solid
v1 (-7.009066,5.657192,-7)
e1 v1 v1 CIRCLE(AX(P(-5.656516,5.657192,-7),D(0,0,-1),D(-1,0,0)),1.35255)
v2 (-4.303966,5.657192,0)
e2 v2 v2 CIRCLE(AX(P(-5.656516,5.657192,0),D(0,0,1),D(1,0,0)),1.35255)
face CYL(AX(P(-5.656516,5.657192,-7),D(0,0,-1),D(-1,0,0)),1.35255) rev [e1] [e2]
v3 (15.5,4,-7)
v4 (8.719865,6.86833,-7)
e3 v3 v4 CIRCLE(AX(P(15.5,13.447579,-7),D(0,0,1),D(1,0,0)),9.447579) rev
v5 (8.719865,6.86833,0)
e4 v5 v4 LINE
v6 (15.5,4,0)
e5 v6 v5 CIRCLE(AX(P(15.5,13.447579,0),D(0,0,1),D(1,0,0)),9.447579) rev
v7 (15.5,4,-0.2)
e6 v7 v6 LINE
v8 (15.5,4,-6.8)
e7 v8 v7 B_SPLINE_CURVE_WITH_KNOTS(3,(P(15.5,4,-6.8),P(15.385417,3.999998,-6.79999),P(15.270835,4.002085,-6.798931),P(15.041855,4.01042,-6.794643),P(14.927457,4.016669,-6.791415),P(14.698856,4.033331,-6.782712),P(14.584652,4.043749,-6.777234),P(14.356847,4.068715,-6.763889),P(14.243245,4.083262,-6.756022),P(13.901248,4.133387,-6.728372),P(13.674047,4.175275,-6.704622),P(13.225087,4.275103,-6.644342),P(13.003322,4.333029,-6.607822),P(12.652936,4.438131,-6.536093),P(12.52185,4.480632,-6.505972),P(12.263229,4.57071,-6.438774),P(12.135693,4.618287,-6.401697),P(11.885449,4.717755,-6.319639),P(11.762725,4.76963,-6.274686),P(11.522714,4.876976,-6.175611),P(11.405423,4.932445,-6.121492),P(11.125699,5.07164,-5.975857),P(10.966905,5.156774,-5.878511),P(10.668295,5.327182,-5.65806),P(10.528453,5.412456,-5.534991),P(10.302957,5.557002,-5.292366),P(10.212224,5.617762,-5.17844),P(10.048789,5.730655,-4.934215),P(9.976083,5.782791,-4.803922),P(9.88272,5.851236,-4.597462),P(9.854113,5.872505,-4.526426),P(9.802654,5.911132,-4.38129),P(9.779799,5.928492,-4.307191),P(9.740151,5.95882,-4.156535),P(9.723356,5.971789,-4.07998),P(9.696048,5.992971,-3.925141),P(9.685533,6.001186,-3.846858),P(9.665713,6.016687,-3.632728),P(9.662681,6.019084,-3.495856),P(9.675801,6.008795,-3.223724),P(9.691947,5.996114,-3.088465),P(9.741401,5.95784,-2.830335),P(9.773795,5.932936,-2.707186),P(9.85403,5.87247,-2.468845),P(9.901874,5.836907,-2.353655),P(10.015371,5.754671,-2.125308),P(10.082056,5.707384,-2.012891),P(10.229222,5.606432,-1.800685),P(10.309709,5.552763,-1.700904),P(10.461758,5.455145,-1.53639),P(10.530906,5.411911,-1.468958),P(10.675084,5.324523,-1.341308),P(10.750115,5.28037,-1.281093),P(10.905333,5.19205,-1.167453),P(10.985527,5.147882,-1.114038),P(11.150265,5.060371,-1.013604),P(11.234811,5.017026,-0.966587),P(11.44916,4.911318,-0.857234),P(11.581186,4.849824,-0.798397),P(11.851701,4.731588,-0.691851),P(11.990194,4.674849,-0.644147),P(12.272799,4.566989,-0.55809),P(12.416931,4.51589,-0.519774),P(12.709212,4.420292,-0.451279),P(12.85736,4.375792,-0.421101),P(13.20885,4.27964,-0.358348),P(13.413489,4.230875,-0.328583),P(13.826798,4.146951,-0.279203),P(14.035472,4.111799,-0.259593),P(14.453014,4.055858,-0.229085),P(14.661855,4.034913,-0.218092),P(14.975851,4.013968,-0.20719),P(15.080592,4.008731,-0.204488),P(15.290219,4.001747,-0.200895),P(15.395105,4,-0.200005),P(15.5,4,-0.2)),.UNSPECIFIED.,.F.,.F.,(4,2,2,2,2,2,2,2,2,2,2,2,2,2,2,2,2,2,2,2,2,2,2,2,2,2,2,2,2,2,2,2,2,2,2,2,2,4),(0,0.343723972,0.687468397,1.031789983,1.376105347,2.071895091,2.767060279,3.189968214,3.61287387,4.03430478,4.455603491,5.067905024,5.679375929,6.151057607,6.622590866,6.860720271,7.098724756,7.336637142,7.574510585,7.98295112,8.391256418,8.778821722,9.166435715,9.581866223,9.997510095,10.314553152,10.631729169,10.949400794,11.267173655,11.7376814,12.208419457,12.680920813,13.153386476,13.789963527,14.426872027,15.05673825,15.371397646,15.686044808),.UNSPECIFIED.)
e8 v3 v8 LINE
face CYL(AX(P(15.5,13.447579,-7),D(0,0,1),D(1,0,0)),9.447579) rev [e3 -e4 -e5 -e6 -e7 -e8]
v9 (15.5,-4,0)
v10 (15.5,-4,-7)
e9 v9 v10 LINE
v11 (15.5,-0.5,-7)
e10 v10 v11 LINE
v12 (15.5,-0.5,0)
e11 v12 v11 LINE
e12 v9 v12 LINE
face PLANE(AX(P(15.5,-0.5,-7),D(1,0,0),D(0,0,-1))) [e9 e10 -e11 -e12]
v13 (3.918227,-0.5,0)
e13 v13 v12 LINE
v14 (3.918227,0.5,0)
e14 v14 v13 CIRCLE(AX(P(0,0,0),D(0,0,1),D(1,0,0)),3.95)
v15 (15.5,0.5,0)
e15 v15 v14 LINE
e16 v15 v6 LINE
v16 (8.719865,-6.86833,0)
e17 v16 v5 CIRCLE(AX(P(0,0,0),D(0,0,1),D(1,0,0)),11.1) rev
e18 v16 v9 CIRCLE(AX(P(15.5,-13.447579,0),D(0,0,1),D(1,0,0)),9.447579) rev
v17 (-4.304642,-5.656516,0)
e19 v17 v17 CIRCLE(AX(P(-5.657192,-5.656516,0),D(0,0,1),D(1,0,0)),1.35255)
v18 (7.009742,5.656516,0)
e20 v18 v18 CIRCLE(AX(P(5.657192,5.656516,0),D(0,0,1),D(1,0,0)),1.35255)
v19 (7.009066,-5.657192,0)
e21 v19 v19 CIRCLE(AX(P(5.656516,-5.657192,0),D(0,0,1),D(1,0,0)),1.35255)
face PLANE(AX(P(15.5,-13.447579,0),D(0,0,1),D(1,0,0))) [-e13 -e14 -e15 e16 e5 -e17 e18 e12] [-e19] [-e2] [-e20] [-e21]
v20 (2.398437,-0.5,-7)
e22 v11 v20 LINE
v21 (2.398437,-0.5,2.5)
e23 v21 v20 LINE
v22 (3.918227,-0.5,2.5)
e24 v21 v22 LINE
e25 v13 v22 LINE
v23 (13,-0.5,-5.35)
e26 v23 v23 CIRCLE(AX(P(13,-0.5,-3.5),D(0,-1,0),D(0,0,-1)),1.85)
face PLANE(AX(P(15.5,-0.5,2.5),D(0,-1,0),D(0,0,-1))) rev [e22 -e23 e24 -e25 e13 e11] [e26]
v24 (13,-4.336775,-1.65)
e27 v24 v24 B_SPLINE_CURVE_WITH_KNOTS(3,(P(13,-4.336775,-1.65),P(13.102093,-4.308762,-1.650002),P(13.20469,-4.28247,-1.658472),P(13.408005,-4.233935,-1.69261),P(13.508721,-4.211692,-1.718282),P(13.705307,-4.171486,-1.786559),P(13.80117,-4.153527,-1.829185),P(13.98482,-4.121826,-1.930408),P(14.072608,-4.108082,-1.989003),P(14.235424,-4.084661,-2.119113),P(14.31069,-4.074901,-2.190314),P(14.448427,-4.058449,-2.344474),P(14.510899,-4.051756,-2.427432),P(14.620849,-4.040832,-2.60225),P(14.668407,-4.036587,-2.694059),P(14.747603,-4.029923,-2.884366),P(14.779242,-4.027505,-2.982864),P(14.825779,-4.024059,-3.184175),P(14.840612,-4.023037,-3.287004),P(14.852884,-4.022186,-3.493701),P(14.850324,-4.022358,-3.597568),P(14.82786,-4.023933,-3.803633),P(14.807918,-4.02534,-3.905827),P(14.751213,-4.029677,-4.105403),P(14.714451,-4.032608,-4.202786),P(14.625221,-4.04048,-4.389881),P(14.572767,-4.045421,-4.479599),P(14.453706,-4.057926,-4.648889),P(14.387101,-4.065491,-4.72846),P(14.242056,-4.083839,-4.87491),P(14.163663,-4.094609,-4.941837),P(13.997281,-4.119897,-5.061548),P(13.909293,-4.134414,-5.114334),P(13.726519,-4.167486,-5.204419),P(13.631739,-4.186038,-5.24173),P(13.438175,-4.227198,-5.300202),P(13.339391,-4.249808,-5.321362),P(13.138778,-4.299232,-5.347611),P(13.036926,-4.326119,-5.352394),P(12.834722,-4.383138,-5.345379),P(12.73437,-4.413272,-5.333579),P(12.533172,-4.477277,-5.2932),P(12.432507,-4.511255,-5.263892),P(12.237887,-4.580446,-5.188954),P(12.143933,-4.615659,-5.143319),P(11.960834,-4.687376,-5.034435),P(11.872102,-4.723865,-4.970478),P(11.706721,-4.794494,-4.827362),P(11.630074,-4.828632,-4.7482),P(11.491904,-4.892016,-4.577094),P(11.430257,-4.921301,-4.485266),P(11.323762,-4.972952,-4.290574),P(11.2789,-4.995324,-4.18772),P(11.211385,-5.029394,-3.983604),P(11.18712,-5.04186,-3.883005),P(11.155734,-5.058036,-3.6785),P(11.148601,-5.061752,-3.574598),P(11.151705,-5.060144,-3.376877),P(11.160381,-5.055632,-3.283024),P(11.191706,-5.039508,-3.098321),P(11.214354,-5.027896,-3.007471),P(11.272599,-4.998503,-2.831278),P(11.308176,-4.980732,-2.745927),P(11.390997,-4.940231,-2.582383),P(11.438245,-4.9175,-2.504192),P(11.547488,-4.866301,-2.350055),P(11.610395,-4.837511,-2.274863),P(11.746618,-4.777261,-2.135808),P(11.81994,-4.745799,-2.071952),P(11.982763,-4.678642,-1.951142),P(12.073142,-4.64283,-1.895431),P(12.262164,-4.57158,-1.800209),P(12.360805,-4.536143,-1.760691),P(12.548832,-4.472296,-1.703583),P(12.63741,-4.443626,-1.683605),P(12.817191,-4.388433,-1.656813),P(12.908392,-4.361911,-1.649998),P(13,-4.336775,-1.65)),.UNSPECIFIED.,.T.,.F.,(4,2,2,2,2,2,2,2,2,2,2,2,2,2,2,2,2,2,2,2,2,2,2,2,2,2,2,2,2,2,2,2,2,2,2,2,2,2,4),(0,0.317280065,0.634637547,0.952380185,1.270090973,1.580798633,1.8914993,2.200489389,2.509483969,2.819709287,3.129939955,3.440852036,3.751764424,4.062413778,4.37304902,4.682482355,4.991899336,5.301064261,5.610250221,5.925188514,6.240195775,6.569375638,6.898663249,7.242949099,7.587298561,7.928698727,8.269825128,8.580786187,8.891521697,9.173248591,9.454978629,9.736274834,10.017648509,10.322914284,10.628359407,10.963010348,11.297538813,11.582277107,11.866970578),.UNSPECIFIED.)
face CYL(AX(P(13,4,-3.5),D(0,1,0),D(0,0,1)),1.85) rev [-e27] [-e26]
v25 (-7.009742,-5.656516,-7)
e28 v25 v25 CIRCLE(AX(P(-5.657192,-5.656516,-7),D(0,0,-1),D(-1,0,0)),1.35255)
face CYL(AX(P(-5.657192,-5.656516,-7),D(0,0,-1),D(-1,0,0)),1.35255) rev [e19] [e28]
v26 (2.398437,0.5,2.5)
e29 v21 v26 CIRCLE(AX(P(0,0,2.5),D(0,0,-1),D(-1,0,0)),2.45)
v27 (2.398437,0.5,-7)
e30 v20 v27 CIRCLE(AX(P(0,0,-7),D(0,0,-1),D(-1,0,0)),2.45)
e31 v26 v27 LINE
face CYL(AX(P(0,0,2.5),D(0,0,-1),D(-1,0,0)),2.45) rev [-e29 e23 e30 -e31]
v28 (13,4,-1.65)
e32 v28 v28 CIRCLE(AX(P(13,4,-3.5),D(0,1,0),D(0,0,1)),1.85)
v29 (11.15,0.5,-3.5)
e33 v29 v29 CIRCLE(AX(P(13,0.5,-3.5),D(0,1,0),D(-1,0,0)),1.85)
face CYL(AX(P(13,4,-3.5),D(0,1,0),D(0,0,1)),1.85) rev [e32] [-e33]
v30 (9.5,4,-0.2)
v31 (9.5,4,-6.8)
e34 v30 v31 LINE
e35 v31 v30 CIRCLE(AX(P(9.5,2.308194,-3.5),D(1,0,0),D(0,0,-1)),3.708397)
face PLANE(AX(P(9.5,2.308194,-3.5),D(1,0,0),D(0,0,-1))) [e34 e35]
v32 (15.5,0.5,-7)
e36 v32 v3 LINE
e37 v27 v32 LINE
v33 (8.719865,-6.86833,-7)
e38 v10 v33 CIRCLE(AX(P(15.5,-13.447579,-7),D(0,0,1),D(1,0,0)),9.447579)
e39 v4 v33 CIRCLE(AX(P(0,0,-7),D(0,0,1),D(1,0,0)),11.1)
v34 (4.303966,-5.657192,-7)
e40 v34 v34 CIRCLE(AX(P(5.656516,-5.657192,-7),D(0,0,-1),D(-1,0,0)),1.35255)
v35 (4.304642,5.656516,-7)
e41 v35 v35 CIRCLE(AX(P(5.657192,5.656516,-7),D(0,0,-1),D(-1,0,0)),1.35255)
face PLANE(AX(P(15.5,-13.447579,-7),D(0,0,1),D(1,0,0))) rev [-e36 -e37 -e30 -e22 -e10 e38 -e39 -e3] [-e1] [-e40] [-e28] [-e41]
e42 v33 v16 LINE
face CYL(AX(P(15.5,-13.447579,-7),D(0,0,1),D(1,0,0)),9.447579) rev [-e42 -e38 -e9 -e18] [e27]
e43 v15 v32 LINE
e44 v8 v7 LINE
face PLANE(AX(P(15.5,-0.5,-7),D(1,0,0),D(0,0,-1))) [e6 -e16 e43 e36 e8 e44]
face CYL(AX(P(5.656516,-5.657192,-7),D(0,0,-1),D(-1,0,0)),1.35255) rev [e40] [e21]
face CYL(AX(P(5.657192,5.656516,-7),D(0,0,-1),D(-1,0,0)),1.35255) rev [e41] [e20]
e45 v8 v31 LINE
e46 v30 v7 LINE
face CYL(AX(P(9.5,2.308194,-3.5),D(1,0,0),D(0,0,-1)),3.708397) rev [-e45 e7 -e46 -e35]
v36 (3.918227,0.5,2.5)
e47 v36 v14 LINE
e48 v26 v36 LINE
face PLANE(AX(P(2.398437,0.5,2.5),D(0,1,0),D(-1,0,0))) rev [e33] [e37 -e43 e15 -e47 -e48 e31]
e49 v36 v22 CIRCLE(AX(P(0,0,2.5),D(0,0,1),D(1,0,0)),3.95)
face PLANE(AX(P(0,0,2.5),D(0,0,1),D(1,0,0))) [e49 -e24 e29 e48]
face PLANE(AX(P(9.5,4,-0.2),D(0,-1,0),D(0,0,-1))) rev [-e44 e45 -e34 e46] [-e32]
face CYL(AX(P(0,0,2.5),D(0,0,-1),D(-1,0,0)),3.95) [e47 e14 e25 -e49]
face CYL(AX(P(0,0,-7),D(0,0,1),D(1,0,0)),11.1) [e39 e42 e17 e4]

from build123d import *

# Parameters (mm, degrees)
CUT_EXTRUDE1_START             = -0.2
CUT_EXTRUDE1_DEPTH             = 0.2
CUT_EXTRUDE1_START_2           = -7
CUT_EXTRUDE1_2_DEPTH           = 0.1999999
CUT_EXTRUDE1_START_3           = -6.8000001
CUT_EXTRUDE1_3_DEPTH           = 6.6000001
CUT_EXTRUDE1_START_4           = 9.5
CUT_EXTRUDE1_4_DEPTH           = 6.5
SKETCH2_R                      = 3.95
BOSS_EXTRUDE1_DEPTH            = 2.5
CUT_EXTRUDE2_DEPTH             = 22.300469551
SKETCH4_W                      = 2.45
SKETCH4_H                      = 9.5
M2_5_CLEARANCE_HOLE1_D         = 2.7051
M2_5_CLEARANCE_HOLE1_DEPTH     = 9.5
SKETCH7_W                      = 1.35255
SKETCH7_H                      = 10.6
F_3_7_3_7_DIAMETER_HOLE1_D     = 3.7
F_3_7_3_7_DIAMETER_HOLE1_DEPTH = 15.1


with BuildPart() as part:
    # Cut-Extrude1: read off the stored shape, not the designer's step
    # Cut-Extrude1 outline → Cut-Extrude1 (new body)
    with BuildSketch(Plane.XY.offset(CUT_EXTRUDE1_START)):
        with BuildLine():
            ThreePointArc((8.719864541, -6.868330393), (11.819050527, -4.746581358), (15.5, -4))
            Line((15.5, -4), (15.5, 4))
            ThreePointArc((15.5, 4), (11.819050527, 4.746581358), (8.719864541, 6.868330393))
            ThreePointArc((8.719864541, 6.868330393), (-11.1, 0), (8.719864541, -6.868330393))
        make_face()
    extrude(amount=CUT_EXTRUDE1_DEPTH)



with BuildPart() as body_2:
    # Cut-Extrude1 2 outline → Cut-Extrude1 2 (new body)
    with BuildSketch(Plane.XY.offset(CUT_EXTRUDE1_START_2)):
        with BuildLine():
            ThreePointArc((8.719864541, -6.868330393), (11.819050527, -4.746581358), (15.5, -4))
            Line((15.5, -4), (15.5, 4))
            ThreePointArc((15.5, 4), (11.819050527, 4.746581358), (8.719864541, 6.868330393))
            ThreePointArc((8.719864541, 6.868330393), (-11.1, 0), (8.719864541, -6.868330393))
        make_face()
    extrude(amount=CUT_EXTRUDE1_2_DEPTH)


with BuildPart() as part_1:
    add(part.part)

    add(body_2.part)  # Cut-Extrude1 3 merges body 2
    # Cut-Extrude1 3 outline → Cut-Extrude1 3 (add)
    with BuildSketch(Plane.XY.offset(CUT_EXTRUDE1_START_3)):
        with BuildLine():
            ThreePointArc((8.719864541, -6.868330393), (11.819050527, -4.746581358), (15.5, -4))
            Line((15.5, -4), (15.5, 4))
            ThreePointArc((15.5, 4), (11.819050527, 4.746581358), (8.719864541, 6.868330393))
            ThreePointArc((8.719864541, 6.868330393), (-11.1, 0), (8.719864541, -6.868330393))
        make_face()
    extrude(amount=CUT_EXTRUDE1_3_DEPTH)

    # Cut-Extrude1 4 outline → Cut-Extrude1 4 (cut)
    with BuildSketch(Plane.YZ.offset(CUT_EXTRUDE1_START_4)):
        with BuildLine():
            ThreePointArc((4, -6.8), (6.016591059, -3.5), (4, -0.2))
            Line((4, -0.2), (4, -6.8))
        make_face()
    extrude(amount=CUT_EXTRUDE1_4_DEPTH, mode=Mode.SUBTRACT)

    # Sketch2 → Boss-Extrude1 (add)
    with BuildSketch(Plane.XY):
        Circle(SKETCH2_R)
    extrude(amount=BOSS_EXTRUDE1_DEPTH)

    # Sketch3 → Cut-Extrude2 (cut, through all)
    with BuildSketch(Plane(origin=(0, 0, -7), x_dir=(-1, 0, 0), z_dir=(0, 0, -1))):
        with BuildLine():
            Line((-15.5, 0.5), (-15.5, -0.5))
            Line((-15.5, -0.5), (-2.398436991, -0.5))
            ThreePointArc((-2.398436991, -0.5), (-2.45, 0), (-2.398436991, 0.5))
            Line((-2.398436991, 0.5), (-15.5, 0.5))
        make_face()
    extrude(amount=-CUT_EXTRUDE2_DEPTH, mode=Mode.SUBTRACT)

    # Sketch4 → Cut-Revolve1 (revolve, cut)
    with BuildSketch(Plane.XZ):
        with Locations((1.225, -2.25)):
            Rectangle(SKETCH4_W, SKETCH4_H)
    revolve(axis=Axis((0, 0, 2.5), (0, 0, -1)), mode=Mode.SUBTRACT)

    # M2.5 Clearance Hole1
    with Locations(Plane(origin=(0, 0, -7), x_dir=(-1, 0, 0), z_dir=(0, 0, -1))):
        with Locations((5.656516225, 5.657192254), (-5.657192254, 5.656516225), (-5.656516225, -5.657192254), (5.657192254, -5.656516225)):
            Hole(M2_5_CLEARANCE_HOLE1_D / 2, depth=M2_5_CLEARANCE_HOLE1_DEPTH)

    # Sketch7 → M2.5 Clearance Hole2 (revolve, cut)
    with BuildSketch(Plane(origin=(13, -0.5, -3.5), x_dir=(0, 0, 1), z_dir=(1, 0, 0))):
        with Locations((0.676275, 5.3)):
            Rectangle(SKETCH7_W, SKETCH7_H)
    revolve(axis=Axis((13, 5.85, -3.5), (0, -1, 0)), mode=Mode.SUBTRACT)

    # Ø3.7 (3.7) Diameter Hole1
    with Locations(Plane(origin=(0, 4, 0), x_dir=(1, 0, 0), z_dir=(0, 1, 0))):
        with Locations((13, 3.5)):
            Hole(F_3_7_3_7_DIAMETER_HOLE1_D / 2, depth=F_3_7_3_7_DIAMETER_HOLE1_DEPTH)


solid = part_1.part
